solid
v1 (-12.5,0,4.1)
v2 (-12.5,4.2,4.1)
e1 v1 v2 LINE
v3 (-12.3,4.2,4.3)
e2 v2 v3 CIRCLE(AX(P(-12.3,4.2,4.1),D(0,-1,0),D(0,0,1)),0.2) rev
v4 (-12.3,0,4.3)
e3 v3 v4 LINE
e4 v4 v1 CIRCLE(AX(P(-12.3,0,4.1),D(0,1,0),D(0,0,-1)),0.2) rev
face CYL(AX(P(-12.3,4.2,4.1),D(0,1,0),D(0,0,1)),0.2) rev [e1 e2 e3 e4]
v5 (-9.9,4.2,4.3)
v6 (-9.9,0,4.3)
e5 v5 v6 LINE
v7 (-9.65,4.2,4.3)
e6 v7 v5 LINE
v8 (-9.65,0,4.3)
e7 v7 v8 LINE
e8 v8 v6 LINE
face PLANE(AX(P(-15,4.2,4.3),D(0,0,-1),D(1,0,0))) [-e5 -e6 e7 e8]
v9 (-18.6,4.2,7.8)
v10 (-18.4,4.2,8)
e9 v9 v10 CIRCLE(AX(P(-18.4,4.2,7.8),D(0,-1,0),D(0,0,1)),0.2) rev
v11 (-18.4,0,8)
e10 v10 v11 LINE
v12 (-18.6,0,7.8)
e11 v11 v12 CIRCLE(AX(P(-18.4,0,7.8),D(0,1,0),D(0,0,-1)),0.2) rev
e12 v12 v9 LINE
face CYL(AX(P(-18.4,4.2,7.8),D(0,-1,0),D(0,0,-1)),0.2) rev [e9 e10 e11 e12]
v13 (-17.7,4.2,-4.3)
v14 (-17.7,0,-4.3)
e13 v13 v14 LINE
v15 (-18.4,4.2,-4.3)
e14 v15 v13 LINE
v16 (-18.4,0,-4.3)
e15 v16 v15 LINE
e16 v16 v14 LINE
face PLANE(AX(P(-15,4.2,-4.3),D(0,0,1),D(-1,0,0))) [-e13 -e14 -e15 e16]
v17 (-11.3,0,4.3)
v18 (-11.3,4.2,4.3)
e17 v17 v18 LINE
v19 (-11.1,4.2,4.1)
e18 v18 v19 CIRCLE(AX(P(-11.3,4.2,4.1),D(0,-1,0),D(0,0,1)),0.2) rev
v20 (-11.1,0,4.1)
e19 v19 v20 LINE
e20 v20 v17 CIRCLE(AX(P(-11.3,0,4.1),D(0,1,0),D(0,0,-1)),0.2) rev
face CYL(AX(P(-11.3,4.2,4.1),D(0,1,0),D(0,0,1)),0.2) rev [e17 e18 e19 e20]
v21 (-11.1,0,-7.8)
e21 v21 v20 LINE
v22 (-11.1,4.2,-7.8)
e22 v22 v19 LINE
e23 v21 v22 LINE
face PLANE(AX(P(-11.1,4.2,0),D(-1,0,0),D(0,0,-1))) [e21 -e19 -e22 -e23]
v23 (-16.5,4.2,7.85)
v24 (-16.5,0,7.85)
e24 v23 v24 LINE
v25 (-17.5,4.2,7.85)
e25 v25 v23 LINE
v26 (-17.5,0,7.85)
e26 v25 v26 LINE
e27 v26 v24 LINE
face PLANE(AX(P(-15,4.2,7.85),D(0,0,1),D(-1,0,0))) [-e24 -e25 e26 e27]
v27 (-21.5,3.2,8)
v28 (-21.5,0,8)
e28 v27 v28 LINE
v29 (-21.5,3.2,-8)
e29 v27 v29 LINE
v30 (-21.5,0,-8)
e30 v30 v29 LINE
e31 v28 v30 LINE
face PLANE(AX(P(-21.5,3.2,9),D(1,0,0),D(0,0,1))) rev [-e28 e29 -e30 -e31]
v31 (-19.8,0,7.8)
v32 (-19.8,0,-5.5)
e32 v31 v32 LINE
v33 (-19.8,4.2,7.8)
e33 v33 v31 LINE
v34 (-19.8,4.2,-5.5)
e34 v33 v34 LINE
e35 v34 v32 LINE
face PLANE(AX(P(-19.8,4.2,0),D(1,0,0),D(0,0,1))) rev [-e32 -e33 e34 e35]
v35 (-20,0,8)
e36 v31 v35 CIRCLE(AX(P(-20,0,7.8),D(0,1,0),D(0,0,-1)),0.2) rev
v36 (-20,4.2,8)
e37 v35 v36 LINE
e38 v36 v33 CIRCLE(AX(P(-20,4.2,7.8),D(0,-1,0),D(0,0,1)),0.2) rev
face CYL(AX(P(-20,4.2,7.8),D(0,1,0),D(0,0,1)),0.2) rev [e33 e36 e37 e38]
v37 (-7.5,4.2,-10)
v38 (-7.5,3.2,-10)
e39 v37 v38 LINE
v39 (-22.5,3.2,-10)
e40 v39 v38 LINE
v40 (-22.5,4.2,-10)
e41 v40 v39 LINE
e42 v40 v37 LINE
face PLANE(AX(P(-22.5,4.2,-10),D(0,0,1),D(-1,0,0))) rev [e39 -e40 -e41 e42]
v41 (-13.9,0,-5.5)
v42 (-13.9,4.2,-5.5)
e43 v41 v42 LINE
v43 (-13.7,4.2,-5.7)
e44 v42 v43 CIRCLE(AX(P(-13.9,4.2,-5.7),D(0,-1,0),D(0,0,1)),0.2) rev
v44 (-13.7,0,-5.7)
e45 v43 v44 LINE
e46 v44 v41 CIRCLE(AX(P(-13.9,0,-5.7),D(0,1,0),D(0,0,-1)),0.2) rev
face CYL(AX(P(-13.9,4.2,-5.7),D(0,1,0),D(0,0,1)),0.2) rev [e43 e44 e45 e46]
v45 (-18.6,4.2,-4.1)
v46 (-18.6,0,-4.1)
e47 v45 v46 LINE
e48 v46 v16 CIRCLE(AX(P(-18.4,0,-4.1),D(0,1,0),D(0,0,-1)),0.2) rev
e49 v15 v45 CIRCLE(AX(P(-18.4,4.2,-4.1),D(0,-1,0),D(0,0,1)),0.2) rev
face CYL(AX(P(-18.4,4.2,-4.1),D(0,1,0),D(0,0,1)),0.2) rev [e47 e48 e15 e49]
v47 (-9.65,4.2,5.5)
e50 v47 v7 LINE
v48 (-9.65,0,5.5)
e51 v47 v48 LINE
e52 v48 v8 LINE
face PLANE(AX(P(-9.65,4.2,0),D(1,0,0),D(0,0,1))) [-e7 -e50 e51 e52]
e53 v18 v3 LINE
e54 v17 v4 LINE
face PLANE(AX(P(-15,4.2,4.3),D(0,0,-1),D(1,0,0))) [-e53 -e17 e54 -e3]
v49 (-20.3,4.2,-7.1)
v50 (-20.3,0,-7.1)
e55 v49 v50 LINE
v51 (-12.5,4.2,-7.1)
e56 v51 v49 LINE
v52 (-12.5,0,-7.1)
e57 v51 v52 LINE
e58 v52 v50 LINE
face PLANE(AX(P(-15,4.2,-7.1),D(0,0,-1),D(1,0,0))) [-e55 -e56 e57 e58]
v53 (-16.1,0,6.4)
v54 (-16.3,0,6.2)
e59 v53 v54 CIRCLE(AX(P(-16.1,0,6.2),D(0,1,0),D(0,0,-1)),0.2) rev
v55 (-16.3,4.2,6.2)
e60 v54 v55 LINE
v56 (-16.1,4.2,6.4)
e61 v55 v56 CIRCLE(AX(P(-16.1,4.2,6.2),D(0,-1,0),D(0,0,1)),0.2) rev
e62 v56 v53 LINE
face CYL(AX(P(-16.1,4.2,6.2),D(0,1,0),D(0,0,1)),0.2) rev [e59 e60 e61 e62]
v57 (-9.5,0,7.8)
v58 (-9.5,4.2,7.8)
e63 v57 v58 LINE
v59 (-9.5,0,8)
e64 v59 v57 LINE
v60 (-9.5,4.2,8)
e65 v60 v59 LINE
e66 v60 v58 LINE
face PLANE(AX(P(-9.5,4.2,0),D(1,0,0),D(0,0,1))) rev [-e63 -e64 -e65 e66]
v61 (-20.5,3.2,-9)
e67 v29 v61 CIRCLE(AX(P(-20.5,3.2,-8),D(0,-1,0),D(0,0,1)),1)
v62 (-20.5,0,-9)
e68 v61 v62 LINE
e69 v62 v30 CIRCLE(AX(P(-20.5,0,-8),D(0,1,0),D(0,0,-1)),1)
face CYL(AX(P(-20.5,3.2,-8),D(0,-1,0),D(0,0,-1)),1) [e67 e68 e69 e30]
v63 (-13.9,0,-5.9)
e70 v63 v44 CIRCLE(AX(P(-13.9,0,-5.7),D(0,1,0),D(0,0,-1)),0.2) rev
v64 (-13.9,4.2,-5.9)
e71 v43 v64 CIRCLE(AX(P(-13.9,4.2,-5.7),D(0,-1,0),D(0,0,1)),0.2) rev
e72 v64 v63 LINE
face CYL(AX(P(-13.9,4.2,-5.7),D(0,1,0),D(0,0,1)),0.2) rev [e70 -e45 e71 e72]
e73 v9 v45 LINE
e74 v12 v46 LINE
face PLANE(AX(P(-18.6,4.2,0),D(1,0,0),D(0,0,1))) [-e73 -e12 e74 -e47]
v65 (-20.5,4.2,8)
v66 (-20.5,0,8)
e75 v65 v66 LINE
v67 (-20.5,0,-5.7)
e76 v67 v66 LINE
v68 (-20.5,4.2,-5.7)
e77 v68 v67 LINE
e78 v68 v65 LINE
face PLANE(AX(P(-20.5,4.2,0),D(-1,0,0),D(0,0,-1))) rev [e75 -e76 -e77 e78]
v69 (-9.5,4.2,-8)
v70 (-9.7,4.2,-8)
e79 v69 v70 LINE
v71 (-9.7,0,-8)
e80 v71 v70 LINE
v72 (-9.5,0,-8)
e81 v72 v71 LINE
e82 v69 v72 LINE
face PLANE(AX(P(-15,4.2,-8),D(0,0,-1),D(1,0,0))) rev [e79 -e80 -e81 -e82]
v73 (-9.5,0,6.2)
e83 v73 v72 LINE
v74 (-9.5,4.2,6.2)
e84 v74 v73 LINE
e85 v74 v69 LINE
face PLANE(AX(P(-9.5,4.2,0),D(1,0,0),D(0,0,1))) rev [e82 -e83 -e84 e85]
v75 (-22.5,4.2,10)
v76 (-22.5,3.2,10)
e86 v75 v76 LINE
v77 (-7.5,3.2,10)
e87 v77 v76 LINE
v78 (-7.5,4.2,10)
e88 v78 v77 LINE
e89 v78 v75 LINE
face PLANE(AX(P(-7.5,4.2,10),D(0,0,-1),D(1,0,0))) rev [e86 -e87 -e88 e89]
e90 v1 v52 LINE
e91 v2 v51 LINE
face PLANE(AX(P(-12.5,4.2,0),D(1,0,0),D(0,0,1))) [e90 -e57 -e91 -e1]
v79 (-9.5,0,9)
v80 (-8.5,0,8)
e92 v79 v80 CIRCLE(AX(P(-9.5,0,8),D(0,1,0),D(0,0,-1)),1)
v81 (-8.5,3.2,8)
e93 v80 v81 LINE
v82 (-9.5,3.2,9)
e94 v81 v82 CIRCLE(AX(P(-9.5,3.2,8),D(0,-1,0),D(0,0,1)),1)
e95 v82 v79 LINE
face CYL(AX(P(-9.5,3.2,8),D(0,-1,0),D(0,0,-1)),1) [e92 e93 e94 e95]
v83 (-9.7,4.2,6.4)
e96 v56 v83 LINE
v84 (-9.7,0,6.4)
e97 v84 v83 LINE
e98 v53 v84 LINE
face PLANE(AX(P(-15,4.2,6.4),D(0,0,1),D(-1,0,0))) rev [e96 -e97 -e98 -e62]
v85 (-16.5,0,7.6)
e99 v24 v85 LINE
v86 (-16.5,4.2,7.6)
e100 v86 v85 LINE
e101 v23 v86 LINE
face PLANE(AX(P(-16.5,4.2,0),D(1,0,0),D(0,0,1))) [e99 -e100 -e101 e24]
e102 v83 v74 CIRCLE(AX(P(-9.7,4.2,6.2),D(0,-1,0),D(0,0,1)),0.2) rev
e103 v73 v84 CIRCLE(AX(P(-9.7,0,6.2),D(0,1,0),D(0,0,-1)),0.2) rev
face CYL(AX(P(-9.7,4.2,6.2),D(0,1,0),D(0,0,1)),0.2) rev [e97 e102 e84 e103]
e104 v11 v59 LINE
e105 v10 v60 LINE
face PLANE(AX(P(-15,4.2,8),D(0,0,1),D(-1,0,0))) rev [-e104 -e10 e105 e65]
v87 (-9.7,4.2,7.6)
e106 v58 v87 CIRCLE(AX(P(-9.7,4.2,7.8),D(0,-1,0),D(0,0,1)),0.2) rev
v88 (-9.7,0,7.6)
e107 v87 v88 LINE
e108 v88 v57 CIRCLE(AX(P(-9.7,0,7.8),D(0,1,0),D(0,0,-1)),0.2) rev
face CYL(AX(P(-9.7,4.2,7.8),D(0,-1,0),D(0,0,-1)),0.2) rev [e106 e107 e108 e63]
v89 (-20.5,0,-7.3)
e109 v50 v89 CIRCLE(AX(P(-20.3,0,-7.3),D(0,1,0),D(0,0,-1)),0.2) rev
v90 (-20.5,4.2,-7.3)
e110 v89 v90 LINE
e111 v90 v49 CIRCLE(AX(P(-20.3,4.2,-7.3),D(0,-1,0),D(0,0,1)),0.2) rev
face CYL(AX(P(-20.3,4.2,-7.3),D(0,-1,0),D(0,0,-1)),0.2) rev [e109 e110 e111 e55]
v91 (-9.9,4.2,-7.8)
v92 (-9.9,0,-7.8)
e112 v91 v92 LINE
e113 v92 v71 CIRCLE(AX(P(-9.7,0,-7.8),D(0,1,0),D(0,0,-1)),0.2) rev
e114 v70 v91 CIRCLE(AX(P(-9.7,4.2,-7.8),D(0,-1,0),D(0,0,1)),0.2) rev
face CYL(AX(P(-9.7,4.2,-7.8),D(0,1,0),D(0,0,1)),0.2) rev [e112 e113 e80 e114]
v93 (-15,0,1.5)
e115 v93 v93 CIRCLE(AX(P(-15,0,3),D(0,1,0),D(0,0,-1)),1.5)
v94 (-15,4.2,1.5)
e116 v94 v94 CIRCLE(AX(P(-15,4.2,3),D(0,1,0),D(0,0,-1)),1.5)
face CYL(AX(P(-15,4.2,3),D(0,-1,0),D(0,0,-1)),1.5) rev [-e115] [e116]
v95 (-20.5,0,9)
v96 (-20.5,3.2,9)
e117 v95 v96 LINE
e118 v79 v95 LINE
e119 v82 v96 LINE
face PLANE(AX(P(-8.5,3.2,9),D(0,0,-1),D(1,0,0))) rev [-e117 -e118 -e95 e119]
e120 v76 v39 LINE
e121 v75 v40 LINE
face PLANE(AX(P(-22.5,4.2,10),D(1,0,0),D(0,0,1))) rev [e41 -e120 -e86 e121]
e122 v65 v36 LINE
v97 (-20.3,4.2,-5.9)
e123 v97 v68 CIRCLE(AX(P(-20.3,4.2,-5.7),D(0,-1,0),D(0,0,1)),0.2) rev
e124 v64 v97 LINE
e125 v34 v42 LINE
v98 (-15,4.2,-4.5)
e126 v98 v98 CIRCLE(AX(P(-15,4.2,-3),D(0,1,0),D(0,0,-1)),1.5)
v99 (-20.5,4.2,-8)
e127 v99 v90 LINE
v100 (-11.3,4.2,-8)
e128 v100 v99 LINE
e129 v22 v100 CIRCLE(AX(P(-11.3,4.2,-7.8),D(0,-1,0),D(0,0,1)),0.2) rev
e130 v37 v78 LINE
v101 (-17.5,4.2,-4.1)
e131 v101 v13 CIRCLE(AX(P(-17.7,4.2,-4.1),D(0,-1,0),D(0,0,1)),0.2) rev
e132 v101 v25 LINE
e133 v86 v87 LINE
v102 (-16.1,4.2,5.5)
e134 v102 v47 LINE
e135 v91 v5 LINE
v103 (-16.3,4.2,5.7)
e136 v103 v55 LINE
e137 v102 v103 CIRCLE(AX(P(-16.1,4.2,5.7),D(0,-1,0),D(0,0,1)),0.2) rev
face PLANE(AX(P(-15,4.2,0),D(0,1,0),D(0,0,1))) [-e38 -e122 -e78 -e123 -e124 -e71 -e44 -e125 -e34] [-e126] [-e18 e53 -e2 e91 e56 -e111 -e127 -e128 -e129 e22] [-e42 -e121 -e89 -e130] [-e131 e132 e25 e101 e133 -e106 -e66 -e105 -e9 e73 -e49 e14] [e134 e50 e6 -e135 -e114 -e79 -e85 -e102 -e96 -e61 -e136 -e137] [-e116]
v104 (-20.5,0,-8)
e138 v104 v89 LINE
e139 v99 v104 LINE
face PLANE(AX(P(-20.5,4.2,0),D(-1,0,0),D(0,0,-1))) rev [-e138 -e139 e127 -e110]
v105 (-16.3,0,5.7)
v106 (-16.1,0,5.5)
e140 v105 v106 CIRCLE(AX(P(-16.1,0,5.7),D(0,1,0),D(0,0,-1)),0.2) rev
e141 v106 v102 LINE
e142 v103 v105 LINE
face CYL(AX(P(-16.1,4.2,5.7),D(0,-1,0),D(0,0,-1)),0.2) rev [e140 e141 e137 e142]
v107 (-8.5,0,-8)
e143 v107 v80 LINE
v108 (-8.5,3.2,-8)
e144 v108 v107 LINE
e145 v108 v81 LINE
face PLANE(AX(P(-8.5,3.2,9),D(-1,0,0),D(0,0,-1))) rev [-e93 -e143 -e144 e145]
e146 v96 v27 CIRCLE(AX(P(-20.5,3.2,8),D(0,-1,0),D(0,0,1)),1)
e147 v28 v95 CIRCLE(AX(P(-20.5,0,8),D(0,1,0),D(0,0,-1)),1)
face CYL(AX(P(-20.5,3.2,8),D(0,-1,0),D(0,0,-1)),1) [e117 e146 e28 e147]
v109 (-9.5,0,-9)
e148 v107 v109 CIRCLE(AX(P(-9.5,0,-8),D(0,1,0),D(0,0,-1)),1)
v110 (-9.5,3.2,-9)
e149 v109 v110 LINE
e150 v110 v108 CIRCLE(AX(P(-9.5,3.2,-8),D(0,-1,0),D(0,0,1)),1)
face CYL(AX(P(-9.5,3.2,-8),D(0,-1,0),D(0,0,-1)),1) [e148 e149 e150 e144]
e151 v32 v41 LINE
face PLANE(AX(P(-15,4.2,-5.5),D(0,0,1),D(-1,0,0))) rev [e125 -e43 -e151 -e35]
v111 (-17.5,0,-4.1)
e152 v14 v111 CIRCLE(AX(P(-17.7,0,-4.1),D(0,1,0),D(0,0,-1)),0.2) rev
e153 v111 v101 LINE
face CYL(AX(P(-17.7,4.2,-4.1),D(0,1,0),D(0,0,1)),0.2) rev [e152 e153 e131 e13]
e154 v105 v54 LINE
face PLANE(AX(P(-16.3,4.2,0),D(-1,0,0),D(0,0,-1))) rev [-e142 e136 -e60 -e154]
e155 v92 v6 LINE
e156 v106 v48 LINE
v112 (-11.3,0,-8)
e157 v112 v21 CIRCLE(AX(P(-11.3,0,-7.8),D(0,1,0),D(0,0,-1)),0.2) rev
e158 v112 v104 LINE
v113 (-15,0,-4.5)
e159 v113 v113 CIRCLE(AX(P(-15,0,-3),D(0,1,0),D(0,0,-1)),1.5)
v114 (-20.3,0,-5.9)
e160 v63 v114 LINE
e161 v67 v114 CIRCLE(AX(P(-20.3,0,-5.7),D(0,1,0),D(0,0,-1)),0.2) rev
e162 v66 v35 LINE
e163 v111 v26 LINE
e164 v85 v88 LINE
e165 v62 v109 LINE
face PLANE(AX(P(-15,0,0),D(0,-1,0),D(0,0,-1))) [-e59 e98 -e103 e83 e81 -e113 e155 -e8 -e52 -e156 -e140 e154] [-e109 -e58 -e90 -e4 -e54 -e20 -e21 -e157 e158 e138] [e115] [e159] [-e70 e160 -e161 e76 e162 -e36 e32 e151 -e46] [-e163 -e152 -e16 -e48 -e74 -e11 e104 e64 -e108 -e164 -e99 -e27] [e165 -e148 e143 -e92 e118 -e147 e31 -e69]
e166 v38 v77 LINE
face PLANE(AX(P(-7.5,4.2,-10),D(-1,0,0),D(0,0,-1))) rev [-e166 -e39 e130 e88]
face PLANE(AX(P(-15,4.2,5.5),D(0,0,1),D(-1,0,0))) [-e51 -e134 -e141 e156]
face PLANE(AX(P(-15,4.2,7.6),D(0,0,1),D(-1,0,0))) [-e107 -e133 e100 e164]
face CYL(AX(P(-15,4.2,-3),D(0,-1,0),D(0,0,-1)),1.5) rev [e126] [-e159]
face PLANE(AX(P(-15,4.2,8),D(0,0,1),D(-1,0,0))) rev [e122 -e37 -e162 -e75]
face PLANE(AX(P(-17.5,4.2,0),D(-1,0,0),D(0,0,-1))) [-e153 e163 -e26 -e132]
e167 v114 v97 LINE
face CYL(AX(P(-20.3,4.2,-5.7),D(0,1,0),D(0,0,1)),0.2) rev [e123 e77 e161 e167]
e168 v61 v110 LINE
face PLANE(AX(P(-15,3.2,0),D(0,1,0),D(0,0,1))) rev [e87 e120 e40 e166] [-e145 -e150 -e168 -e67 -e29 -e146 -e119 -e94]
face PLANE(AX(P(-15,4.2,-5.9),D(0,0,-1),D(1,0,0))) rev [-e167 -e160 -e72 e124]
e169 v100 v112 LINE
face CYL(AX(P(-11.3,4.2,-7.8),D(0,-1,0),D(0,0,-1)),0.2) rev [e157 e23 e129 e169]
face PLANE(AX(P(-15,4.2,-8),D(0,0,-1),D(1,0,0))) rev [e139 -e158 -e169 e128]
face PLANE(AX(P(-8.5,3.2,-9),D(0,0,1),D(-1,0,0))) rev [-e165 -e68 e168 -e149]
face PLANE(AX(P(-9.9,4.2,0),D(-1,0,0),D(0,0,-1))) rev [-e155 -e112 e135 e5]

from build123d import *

# Parameters (mm, degrees)
SKETCH1_W           = 13
SKETCH1_H           = 18
BOSS_EXTRUDE1_DEPTH = 3.2
SKETCH2_W           = 15
SKETCH2_H           = 20
BOSS_EXTRUDE2_DEPTH = 1
SKETCH3_R           = 1.5
CUT_EXTRUDE1_DEPTH  = 14.18673576
FILLET1_R           = 0.2
FILLET2_R           = 1


with BuildPart() as part:
    # Sketch1 → Boss-Extrude1 (new body)
    with BuildSketch(Plane(origin=(0, 0, 0), x_dir=(1, 0, 0), z_dir=(0, 1, 0))):
        Rectangle(SKETCH1_W, SKETCH1_H)
    extrude(amount=BOSS_EXTRUDE1_DEPTH)

    # Sketch2 → Boss-Extrude2 (add)
    with BuildSketch(Plane(origin=(0, 3.2, 0), x_dir=(1, 0, 0), z_dir=(0, 1, 0))):
        Rectangle(SKETCH2_W, SKETCH2_H)
    extrude(amount=BOSS_EXTRUDE2_DEPTH)

    # Sketch3 → Cut-Extrude1 (cut, through all)
    with BuildSketch(Plane.XZ):
        with Locations(Location((0, 3, 0), (0, 0, 270))):
            Circle(SKETCH3_R)
        with Locations(Location((0, -3, 0), (0, 0, 270))):
            Circle(SKETCH3_R)
        Polygon((4.8, -5.5), (-1.3, -5.5), (-1.3, -5.9), (5.5, -5.9), (5.5, 8), (4.8, 8), align=None)
        Polygon((2.5, 7.85), (2.5, -4.3), (3.6, -4.3), (3.6, 8), (-5.5, 8), (-5.5, 7.6), (1.5, 7.6), (1.5, 7.85), align=None)
        Polygon((-2.5, -7.1), (-2.5, 4.3), (-3.9, 4.3), (-3.9, -8), (5.5, -8), (5.5, -7.1), align=None)
        Polygon((-5.35, 5.5), (1.3, 5.5), (1.3, 6.4), (-5.5, 6.4), (-5.5, -8), (-5.1, -8), (-5.1, 4.3), (-5.35, 4.3), align=None)
    extrude(amount=-CUT_EXTRUDE1_DEPTH, mode=Mode.SUBTRACT)

    # Fillet1
    fillet1_edges = [part.edges().sort_by_distance(p)[0] for p in [
        (-5.1, 2.1, -8),
        (-3.9, 2.1, -8),
        (-5.5, 2.1, 6.4),
        (-5.5, 2.1, 7.6),
        (4.8, 2.1, 8),
        (3.6, 2.1, 8),
        (-3.9, 2.1, 4.3),
        (-2.5, 2.1, 4.3),
        (1.3, 2.1, 5.5),
        (1.3, 2.1, 6.4),
        (5.5, 2.1, -7.1),
        (5.5, 2.1, -5.9),
        (-1.3, 2.1, -5.9),
        (-1.3, 2.1, -5.5),
        (3.6, 2.1, -4.3),
        (2.5, 2.1, -4.3),
    ]]
    fillet(fillet1_edges, radius=FILLET1_R - 0.0001)  # a hair under: the kernel refuses the full size

    # Fillet2
    fillet2_edges = [part.edges().sort_by_distance(p)[0] for p in [
        (6.5, 1.6, 9),
        (-6.5, 1.6, 9),
        (-6.5, 1.6, -9),
        (6.5, 1.6, -9),
    ]]
    fillet(fillet2_edges, radius=FILLET2_R)


with BuildPart() as body_2:
    # Mirror1: mirrored copy
    add(part.part.mirror(Plane(origin=(-7.5, 4.2, -10), x_dir=(0, 0, 1), z_dir=(1, 0, 0))))


solid = body_2.part
